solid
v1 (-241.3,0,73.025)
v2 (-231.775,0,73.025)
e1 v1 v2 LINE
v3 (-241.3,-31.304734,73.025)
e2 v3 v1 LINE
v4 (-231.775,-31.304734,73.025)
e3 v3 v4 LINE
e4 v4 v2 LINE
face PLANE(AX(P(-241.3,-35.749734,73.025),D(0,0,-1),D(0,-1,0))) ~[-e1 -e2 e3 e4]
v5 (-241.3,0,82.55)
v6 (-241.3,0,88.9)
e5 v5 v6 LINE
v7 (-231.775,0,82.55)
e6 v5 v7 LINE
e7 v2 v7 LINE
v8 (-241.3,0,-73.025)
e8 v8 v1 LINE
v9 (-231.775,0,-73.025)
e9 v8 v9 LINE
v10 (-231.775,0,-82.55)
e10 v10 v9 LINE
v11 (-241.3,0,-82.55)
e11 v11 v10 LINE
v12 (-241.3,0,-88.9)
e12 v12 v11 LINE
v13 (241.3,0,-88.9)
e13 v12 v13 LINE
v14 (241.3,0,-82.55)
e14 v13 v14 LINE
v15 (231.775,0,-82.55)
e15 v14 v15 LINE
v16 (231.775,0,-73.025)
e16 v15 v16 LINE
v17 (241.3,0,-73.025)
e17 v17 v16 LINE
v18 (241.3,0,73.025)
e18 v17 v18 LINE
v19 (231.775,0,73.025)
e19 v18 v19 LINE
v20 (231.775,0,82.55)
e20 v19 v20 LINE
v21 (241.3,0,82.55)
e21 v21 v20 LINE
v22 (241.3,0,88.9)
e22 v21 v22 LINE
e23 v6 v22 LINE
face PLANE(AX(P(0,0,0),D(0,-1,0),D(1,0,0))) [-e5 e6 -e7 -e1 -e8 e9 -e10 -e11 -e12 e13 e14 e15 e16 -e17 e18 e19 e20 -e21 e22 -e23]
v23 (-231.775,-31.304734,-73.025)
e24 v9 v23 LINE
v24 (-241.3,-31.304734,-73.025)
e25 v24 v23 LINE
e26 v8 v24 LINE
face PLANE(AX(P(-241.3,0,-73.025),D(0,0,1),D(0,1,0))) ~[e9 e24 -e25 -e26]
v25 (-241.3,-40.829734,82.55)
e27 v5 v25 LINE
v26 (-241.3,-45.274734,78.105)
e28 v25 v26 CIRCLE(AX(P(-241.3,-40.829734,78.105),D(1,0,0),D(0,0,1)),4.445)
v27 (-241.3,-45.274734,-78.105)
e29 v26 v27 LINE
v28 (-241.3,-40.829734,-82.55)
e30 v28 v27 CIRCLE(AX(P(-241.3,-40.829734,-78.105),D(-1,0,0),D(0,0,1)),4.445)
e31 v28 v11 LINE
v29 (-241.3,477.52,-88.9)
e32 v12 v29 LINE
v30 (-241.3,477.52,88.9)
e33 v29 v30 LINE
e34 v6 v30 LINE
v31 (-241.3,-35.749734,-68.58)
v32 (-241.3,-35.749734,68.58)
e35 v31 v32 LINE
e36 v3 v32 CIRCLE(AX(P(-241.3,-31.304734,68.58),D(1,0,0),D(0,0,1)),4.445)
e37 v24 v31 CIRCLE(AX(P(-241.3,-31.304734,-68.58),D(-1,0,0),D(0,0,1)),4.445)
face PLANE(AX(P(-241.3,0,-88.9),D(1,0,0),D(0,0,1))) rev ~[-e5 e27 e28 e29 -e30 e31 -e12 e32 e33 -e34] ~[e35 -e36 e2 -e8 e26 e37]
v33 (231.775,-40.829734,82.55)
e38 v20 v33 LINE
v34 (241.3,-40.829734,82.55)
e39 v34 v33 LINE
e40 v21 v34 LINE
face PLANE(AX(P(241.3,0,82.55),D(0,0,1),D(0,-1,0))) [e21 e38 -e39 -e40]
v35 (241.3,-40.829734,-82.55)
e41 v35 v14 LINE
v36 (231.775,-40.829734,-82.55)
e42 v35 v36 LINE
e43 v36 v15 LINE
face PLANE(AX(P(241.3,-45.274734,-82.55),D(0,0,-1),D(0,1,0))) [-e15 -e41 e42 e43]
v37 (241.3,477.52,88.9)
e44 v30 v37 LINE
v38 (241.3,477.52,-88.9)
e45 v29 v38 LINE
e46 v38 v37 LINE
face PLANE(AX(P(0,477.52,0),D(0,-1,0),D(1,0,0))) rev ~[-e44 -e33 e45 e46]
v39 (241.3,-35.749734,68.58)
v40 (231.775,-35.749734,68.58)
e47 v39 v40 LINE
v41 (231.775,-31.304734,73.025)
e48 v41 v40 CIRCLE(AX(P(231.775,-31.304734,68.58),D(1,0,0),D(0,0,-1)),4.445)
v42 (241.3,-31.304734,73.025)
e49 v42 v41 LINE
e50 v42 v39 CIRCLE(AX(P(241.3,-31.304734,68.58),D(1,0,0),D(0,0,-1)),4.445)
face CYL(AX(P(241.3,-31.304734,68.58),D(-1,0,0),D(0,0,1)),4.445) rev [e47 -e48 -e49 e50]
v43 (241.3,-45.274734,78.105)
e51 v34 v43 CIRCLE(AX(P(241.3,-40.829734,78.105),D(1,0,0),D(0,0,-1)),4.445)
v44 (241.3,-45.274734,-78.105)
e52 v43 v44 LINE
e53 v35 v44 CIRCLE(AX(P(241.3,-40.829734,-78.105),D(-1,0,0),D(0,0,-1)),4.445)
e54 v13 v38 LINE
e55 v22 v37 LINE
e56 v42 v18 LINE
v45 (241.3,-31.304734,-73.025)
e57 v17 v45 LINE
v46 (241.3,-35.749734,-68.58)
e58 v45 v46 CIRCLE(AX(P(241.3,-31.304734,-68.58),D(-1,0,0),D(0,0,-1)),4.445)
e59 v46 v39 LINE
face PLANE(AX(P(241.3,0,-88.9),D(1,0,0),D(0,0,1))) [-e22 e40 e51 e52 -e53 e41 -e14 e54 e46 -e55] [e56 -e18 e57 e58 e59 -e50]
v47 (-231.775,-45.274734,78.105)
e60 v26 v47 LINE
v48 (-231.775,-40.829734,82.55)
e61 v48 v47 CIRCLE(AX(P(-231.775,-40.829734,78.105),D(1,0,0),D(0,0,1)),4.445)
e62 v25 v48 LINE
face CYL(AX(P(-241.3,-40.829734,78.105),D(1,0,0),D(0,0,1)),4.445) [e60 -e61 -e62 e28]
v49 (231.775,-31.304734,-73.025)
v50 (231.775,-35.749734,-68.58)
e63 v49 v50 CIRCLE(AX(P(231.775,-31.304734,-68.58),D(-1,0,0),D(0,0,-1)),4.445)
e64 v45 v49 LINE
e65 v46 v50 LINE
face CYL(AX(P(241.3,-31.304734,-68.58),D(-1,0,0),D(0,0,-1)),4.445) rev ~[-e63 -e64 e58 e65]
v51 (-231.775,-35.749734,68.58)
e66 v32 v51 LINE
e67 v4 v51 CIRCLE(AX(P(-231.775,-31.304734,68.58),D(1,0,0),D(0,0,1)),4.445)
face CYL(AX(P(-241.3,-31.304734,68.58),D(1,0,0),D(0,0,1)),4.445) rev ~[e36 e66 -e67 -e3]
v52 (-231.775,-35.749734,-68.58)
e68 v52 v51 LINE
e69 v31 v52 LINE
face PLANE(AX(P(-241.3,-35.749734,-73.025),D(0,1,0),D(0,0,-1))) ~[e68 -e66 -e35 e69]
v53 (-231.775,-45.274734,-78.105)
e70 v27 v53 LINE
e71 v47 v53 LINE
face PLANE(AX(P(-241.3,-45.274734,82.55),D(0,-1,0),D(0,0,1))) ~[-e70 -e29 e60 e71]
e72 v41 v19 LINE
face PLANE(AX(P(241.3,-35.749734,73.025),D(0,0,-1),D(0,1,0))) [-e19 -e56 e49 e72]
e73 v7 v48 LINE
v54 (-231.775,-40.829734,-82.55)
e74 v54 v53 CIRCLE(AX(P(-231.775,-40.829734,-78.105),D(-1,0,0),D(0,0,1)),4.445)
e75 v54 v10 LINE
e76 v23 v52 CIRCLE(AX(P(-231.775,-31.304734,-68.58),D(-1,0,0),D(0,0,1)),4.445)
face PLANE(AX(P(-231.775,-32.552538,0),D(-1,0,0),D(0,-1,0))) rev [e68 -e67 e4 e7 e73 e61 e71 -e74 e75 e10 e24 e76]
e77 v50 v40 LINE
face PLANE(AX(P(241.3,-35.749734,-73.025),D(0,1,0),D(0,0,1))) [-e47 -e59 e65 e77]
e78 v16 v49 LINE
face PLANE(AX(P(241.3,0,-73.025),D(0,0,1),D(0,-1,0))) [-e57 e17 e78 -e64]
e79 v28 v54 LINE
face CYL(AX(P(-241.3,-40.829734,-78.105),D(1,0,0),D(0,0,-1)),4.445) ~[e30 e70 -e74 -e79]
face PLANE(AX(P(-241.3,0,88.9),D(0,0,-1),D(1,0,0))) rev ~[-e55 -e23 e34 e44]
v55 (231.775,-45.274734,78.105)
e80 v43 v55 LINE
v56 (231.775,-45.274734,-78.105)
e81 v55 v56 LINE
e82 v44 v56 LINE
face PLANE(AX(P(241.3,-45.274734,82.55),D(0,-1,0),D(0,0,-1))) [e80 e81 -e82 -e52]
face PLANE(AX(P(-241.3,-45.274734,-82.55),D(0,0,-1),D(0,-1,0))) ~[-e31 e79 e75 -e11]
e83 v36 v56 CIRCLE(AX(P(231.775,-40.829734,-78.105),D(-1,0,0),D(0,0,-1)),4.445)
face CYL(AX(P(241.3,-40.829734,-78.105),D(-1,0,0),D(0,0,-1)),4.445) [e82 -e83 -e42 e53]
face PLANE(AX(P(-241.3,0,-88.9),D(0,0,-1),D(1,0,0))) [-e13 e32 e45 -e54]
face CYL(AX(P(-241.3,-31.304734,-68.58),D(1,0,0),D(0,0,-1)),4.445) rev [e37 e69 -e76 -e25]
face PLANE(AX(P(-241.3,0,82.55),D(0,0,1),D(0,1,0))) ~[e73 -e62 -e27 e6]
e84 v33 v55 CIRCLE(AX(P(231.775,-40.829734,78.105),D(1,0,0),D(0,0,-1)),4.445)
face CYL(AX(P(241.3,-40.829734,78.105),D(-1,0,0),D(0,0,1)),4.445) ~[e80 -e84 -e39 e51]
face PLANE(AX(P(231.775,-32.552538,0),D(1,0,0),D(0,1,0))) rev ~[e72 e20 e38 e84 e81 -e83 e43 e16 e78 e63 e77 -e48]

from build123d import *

# Parameters (mm, degrees)
F0_W     = 482.6
F0_H     = 177.8
F1_DEPTH = 477.52
F4_DEPTH = 9.525
F5_R     = 4.445


# Not quite as in the source:
# - a pattern or mirror of a feature is missing from the dataset's text; its kind, count and spacing are read off the source's solid


with BuildPart() as f1:
    # F0 (on Front) → F1 (new body)
    with BuildSketch(Plane.XZ):
        Rectangle(F0_W, F0_H)
    extrude(amount=-F1_DEPTH)

    # F3 (on offset) → F4 (join)
    with BuildSketch(Plane.YZ.offset(241.3)):
        Polygon((0, 73.025), (0, 82.55), (-45.2747344971, 82.55), (-45.2747344971, -82.55), (0, -82.55), (0, -73.025), (-35.7497344971, -73.025), (-35.7497344971, 73.025), align=None)
    f4 = extrude(amount=-F4_DEPTH)

    # F4_copies: F4 across plane
    add(f4.mirror(Plane(origin=(0, 0, 0), x_dir=(0, 0, -1), z_dir=(-1, 0, 0))))

    # F5
    f5_edges = [f1.edges().sort_by_distance(p)[0] for p in [
        (236.5375, -45.274734, 82.55),
        (236.5375, -45.274734, -82.55),
        (236.5375, -35.749734, -73.025),
        (236.5375, -35.749734, 73.025),
        (-236.5375, -45.274734, -82.55),
        (-236.5375, -35.749734, -73.025),
        (-236.5375, -35.749734, 73.025),
        (-236.5375, -45.274734, 82.55),
    ]]
    fillet(f5_edges, radius=F5_R)


solid = f1.part
